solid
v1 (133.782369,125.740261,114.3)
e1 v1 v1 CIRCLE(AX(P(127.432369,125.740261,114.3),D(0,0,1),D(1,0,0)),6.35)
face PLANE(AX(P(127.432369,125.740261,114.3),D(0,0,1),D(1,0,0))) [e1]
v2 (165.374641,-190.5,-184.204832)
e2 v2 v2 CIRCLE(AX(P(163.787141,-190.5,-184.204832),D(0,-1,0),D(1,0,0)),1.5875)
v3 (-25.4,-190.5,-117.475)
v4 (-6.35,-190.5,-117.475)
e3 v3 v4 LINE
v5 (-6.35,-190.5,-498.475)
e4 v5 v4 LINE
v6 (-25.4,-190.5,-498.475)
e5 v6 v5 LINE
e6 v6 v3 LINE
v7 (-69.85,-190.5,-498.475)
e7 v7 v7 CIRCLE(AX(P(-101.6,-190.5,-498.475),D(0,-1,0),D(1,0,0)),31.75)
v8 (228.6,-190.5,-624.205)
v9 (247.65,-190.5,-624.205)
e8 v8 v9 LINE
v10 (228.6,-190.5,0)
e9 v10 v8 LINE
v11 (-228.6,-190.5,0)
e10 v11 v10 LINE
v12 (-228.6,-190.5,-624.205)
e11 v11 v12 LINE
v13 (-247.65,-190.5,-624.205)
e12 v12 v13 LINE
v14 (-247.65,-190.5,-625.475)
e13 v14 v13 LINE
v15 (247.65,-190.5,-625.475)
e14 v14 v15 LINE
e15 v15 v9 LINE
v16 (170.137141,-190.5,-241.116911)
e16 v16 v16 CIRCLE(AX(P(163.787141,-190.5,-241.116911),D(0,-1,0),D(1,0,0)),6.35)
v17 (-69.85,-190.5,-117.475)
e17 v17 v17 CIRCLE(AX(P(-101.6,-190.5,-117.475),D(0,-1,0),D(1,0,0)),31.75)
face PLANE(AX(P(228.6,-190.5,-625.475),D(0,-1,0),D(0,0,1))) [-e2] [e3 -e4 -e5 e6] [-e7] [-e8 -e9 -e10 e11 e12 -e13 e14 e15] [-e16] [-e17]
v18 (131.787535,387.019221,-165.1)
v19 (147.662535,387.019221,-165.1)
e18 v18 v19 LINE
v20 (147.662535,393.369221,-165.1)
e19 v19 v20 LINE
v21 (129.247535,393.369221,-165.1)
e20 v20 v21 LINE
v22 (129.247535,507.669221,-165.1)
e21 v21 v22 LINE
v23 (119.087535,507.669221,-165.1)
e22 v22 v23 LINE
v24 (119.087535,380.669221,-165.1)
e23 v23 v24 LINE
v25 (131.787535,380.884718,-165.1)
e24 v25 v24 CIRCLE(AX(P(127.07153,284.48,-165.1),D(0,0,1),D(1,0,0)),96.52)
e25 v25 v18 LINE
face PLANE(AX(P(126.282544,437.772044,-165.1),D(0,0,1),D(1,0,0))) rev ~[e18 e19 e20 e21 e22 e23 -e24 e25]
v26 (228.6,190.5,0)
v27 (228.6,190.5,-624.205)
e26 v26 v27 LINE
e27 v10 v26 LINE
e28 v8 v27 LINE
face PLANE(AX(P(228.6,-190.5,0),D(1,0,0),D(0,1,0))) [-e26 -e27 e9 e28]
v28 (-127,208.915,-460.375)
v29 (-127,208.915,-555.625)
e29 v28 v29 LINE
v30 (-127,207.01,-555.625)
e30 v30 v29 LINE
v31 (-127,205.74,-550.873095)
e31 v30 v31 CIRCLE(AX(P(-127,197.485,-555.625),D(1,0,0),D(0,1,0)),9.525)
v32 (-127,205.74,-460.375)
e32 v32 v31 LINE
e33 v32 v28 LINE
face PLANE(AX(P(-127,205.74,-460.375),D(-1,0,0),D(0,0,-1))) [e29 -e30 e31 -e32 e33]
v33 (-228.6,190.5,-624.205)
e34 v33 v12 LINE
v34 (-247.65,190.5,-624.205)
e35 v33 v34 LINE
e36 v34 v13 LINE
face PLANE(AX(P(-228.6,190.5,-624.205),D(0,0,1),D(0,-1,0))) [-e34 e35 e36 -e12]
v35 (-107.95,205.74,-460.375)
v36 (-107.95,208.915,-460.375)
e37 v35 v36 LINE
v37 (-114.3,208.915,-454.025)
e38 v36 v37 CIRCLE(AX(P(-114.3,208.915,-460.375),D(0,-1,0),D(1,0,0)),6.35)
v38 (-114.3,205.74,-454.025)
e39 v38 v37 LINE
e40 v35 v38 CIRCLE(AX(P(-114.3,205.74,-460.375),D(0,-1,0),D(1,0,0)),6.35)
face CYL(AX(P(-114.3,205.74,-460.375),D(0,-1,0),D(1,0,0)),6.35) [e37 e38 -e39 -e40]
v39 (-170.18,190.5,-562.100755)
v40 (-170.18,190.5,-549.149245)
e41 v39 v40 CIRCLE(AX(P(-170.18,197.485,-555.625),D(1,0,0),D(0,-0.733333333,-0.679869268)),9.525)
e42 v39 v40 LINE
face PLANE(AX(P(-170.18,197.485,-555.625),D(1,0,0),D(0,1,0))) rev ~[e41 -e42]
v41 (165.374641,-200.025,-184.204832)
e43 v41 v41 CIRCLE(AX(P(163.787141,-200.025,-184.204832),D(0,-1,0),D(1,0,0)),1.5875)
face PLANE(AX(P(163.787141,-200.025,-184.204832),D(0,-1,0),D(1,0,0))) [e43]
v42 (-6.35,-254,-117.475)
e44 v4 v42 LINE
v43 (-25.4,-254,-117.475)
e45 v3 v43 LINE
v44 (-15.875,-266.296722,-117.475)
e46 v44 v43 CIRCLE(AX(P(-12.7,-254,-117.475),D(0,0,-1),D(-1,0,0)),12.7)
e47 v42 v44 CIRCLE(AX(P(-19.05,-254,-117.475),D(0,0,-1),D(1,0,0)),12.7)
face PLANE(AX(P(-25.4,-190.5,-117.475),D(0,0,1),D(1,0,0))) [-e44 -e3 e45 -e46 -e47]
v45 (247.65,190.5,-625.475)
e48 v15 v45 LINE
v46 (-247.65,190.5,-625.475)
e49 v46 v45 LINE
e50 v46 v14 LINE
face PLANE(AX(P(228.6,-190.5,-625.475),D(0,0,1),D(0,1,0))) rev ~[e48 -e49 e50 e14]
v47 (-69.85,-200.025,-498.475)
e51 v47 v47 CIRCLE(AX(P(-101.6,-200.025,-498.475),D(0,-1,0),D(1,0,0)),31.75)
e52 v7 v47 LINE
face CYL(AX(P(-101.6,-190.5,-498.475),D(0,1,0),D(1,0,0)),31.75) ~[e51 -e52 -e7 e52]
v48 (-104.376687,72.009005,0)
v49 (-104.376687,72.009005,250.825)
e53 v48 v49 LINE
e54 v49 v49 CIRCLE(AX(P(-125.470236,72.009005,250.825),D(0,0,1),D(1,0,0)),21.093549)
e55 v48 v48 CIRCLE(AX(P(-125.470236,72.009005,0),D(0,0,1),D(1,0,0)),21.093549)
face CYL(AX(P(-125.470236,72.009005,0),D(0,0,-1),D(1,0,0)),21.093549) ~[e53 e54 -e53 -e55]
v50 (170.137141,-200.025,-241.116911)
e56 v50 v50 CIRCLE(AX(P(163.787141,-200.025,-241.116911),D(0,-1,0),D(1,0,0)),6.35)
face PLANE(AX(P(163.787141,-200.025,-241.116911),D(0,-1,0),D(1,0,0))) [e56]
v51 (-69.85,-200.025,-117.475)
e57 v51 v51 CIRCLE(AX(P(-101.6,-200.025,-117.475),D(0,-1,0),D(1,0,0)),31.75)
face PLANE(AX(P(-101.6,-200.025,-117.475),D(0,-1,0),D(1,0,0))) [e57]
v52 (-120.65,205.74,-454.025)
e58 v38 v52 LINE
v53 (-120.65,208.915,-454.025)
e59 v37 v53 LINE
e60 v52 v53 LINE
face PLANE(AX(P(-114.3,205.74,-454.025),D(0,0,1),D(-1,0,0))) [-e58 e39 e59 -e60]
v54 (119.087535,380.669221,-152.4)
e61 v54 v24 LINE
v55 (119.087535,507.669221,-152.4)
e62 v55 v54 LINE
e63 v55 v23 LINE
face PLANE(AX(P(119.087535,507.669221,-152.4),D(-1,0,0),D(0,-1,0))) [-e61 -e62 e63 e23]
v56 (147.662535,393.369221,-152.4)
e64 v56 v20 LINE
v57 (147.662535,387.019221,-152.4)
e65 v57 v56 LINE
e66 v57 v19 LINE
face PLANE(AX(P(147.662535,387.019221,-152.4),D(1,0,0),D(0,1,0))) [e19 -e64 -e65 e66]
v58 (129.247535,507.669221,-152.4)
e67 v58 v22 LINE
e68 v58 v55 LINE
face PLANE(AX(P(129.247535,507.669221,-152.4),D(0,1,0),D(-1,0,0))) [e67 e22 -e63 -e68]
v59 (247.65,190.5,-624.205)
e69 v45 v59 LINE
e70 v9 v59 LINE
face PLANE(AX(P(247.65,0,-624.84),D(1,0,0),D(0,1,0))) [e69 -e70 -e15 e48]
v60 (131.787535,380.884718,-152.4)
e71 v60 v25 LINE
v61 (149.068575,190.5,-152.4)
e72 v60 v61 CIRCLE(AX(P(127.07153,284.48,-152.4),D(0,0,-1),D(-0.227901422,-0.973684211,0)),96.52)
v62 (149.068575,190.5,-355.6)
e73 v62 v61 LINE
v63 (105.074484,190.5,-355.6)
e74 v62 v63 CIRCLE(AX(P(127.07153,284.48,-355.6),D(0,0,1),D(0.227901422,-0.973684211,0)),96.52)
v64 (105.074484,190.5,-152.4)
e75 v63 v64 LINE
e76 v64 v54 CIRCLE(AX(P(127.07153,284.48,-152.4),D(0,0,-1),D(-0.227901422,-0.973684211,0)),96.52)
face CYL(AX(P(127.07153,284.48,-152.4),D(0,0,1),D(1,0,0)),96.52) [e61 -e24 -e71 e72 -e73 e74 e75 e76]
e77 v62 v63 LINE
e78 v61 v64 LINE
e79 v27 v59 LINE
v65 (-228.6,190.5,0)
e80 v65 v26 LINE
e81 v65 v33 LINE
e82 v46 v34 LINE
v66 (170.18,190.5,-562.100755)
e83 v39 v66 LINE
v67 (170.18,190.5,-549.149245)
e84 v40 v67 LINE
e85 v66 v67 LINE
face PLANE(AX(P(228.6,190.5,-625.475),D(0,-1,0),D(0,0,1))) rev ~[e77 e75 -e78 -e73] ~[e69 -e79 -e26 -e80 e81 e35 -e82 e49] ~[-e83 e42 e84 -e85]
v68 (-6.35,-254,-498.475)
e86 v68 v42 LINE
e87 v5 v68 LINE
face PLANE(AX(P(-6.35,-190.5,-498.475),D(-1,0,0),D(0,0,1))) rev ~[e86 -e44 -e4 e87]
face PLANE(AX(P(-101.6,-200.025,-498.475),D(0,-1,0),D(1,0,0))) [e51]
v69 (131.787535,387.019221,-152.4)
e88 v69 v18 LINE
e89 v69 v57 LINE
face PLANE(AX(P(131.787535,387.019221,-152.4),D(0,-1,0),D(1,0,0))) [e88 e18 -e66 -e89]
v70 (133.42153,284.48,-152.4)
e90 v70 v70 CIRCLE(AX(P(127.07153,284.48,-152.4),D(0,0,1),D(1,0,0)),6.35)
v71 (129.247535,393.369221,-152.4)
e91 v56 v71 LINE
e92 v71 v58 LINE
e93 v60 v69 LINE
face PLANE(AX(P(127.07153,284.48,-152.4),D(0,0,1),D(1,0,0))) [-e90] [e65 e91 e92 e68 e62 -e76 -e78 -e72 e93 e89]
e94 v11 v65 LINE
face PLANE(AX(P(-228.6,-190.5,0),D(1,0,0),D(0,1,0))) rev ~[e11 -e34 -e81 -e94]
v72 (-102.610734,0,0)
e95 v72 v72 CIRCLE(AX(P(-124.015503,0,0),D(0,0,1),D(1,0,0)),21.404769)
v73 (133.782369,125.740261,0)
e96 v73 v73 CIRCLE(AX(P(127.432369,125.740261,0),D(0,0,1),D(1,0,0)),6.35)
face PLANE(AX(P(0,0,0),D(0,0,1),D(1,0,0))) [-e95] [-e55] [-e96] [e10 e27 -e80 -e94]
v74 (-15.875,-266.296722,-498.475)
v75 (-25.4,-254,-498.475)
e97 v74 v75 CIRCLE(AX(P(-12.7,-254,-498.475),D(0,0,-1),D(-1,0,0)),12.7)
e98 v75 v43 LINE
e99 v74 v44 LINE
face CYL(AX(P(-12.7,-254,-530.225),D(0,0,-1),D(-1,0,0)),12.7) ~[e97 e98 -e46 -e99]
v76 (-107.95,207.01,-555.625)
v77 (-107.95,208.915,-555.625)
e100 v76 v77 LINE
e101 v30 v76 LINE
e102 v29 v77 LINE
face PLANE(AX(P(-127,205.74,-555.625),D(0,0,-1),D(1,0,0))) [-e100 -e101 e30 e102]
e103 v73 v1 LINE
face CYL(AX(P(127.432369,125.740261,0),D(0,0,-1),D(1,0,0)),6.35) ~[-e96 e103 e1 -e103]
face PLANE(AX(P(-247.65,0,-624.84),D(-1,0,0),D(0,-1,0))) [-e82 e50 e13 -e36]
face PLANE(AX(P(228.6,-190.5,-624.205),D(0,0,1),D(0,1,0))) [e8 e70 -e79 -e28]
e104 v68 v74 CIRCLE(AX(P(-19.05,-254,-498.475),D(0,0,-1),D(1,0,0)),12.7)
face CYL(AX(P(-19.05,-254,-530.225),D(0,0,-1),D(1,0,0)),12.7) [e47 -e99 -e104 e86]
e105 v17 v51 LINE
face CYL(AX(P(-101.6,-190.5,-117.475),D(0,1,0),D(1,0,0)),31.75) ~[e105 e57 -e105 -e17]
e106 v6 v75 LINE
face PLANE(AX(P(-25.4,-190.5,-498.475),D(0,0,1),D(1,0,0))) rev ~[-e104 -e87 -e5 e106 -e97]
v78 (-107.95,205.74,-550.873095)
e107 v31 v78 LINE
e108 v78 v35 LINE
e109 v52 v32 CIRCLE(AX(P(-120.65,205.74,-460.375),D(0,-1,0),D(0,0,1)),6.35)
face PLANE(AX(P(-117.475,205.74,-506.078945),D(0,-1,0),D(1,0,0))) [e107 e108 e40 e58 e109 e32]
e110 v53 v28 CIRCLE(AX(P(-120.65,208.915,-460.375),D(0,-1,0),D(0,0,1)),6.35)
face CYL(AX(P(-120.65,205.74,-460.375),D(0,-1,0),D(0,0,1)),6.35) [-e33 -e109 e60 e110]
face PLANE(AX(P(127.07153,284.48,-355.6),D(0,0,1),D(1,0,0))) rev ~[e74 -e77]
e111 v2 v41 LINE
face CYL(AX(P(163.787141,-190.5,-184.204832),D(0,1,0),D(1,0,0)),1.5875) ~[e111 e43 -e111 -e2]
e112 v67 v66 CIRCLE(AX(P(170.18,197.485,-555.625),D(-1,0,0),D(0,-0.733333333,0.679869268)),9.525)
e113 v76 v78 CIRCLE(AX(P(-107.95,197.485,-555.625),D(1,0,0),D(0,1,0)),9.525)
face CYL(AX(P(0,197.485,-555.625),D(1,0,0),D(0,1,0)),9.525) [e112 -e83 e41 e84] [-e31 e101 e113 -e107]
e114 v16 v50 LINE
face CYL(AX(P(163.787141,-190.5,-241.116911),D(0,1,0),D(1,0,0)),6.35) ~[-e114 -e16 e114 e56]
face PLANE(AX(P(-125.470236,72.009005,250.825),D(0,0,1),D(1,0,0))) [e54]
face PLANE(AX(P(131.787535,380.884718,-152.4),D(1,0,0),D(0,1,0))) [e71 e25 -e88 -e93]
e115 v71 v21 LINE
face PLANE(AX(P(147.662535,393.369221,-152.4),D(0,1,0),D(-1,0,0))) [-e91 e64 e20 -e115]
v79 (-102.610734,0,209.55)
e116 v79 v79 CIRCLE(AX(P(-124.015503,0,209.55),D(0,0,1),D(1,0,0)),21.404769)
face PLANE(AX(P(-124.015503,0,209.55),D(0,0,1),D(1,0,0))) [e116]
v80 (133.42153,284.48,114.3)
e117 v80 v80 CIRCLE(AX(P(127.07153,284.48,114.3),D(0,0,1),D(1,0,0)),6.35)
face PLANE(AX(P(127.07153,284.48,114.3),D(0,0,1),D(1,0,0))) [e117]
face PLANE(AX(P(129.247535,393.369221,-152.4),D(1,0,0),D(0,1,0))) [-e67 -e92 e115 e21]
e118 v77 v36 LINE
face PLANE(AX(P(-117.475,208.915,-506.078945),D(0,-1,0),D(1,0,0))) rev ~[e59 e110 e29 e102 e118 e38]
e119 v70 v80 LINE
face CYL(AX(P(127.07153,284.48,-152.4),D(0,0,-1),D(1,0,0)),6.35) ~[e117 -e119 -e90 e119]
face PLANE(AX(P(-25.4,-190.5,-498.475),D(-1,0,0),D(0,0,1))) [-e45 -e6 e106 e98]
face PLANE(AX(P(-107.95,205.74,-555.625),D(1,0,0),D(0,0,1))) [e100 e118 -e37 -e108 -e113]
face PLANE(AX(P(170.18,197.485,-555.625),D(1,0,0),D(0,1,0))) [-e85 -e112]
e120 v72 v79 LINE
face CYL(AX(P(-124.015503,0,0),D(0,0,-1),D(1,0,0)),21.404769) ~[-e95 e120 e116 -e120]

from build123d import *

# Parameters (mm, degrees)
F0_W         = 457.2
F0_H         = 381
F1_DEPTH     = 625.475
F2_R         = 21.0935486288
F3_DEPTH     = 250.825
F4_R         = 21.4047690014
F5_DEPTH     = 209.55
F6_R         = 31.75
F6_R_2       = 1.5875
F6_R_3       = 6.35
F7_DEPTH     = 9.525
F8_W         = 19.05
F8_H         = 381
F9_DEPTH     = 76.2
F10_T1_DEPTH = 444.5
F12_R        = 96.52
F13_DEPTH    = 203.2
F15_DEPTH    = 12.7
F16_R        = 6.35
F17_DEPTH    = 266.7
F18_R        = 6.35
F19_DEPTH    = 114.3
F20_R        = 9.525
F21_DEPTH    = 170.18
F22_W        = 381
F22_H        = 1.27
F23_DEPTH    = 19.05
F24_W        = 381
F24_H        = 1.27
F25_DEPTH    = 19.05
F28_DEPTH    = 3.175


# Not quite as in the source:
# - a fillet or chamfer that OpenCascade refuses, or shapes differently, is made with other operations: its cross-section is extruded or revolved along the edge and cut away or added


with BuildPart() as f1:
    # F0 (on Top) → F1 (new body)
    with BuildSketch(Plane.XY):
        Rectangle(F0_W, F0_H)
    extrude(amount=-F1_DEPTH)

    # F2 (on face) → F3 (join)
    with BuildSketch(Plane.XY):
        with Locations((-125.4702359438, 72.0090046525)):
            Circle(F2_R)
    extrude(amount=F3_DEPTH)

    # F4 (on face) → F5 (join)
    with BuildSketch(Plane.XY):
        with Locations((-124.0155026317, 0)):
            Circle(F4_R)
    extrude(amount=F5_DEPTH)

    # F6 (on face) → F7 (join)
    with BuildSketch(Plane.XZ.offset(190.5)):
        with Locations((-101.6, -117.475)):
            Circle(F6_R)
        with Locations((-101.6, -498.475)):
            Circle(F6_R)
        with Locations((163.7871414423, -184.2048317194)):
            Circle(F6_R_2)
        with Locations((163.7871414423, -241.1169111729)):
            Circle(F6_R_3)
    extrude(amount=F7_DEPTH)

    # F8 (on face) → F9 (join)
    with BuildSketch(Plane.XZ.offset(190.5)):
        with Locations((-15.875, -307.975)):
            Rectangle(F8_W, F8_H)
    extrude(amount=F9_DEPTH)

    # F10: fillet of radius 12.7 on 2 edges, made by hand

    # F10_s2 → F10_t1 (cut)
    with BuildSketch(Plane.XY.offset(-530.225)):
        with BuildLine():
            ThreePointArc((-25.4, -254), (-21.6802561211, -262.9802561211), (-12.7, -266.7))
            Line((-12.7, -266.7), (-25.4, -266.7))
            Line((-25.4, -266.7), (-25.4, -254))
        make_face()
        with BuildLine():
            ThreePointArc((-6.35, -254), (-10.0697438789, -262.9802561211), (-19.05, -266.7))
            Line((-19.05, -266.7), (-6.35, -266.7))
            Line((-6.35, -266.7), (-6.35, -254))
        make_face()
    extrude(amount=F10_T1_DEPTH, mode=Mode.SUBTRACT)

    # F12 (on offset) → F13 (join)
    with BuildSketch(Plane.XY.offset(-152.4)):
        with Locations((127.0715296268, 284.48)):
            Circle(F12_R)
    extrude(amount=-F13_DEPTH)

    # F14 (on face) → F15 (join)
    with BuildSketch(Plane.XY.offset(-152.4)):
        Polygon((119.0875349175, 393.3692209579), (119.0875349175, 380.6692209579), (131.7875349175, 380.8847182149), (131.7875349175, 387.0192209579), (147.6625349175, 387.0192209579), (147.6625349175, 393.3692209579), (129.2475349175, 393.3692209579), (129.2475349175, 507.6692209579), (119.0875349175, 507.6692209579), align=None)
    extrude(amount=-F15_DEPTH)

    # F16 (on face) → F17 (join)
    with BuildSketch(Plane.XY.offset(-152.4)):
        with Locations((127.0715296268, 284.48)):
            Circle(F16_R)
    extrude(amount=F17_DEPTH)

    # F18 (on face) → F19 (join)
    with BuildSketch(Plane.XY):
        with Locations((127.4323694774, 125.7402606834)):
            Circle(F18_R)
    extrude(amount=F19_DEPTH)

    # F20 (on Right) → F21 (join, symmetric)
    with BuildSketch(Plane.YZ):
        with Locations((197.485, -555.625)):
            Circle(F20_R)
    extrude(amount=F21_DEPTH, both=True)

    # F22 (on face) → F23 (join)
    with BuildSketch(Plane(origin=(-228.6, 0, 0), x_dir=(0, -1, 0), z_dir=(-1, 0, 0))):
        with Locations((0, -624.84)):
            Rectangle(F22_W, F22_H)
    extrude(amount=F23_DEPTH)

    # F24 (on face) → F25 (join)
    with BuildSketch(Plane.YZ.offset(228.6)):
        with Locations((0, -624.84)):
            Rectangle(F24_W, F24_H)
    extrude(amount=F25_DEPTH)

    # F27 (on offset) → F28 (join)
    with BuildSketch(Plane.XZ.offset(-205.74)):
        with BuildLine():
            Line((-127, -555.625), (-107.95, -555.625))
            Line((-107.95, -555.625), (-107.95, -460.375))
            ThreePointArc((-107.95, -460.375), (-109.8098719395, -455.8848719395), (-114.3, -454.025))
            Line((-114.3, -454.025), (-120.65, -454.025))
            ThreePointArc((-120.65, -454.025), (-125.1401280605, -455.8848719395), (-127, -460.375))
            Line((-127, -460.375), (-127, -555.625))
        make_face()
    extrude(amount=-F28_DEPTH)


solid = f1.part
